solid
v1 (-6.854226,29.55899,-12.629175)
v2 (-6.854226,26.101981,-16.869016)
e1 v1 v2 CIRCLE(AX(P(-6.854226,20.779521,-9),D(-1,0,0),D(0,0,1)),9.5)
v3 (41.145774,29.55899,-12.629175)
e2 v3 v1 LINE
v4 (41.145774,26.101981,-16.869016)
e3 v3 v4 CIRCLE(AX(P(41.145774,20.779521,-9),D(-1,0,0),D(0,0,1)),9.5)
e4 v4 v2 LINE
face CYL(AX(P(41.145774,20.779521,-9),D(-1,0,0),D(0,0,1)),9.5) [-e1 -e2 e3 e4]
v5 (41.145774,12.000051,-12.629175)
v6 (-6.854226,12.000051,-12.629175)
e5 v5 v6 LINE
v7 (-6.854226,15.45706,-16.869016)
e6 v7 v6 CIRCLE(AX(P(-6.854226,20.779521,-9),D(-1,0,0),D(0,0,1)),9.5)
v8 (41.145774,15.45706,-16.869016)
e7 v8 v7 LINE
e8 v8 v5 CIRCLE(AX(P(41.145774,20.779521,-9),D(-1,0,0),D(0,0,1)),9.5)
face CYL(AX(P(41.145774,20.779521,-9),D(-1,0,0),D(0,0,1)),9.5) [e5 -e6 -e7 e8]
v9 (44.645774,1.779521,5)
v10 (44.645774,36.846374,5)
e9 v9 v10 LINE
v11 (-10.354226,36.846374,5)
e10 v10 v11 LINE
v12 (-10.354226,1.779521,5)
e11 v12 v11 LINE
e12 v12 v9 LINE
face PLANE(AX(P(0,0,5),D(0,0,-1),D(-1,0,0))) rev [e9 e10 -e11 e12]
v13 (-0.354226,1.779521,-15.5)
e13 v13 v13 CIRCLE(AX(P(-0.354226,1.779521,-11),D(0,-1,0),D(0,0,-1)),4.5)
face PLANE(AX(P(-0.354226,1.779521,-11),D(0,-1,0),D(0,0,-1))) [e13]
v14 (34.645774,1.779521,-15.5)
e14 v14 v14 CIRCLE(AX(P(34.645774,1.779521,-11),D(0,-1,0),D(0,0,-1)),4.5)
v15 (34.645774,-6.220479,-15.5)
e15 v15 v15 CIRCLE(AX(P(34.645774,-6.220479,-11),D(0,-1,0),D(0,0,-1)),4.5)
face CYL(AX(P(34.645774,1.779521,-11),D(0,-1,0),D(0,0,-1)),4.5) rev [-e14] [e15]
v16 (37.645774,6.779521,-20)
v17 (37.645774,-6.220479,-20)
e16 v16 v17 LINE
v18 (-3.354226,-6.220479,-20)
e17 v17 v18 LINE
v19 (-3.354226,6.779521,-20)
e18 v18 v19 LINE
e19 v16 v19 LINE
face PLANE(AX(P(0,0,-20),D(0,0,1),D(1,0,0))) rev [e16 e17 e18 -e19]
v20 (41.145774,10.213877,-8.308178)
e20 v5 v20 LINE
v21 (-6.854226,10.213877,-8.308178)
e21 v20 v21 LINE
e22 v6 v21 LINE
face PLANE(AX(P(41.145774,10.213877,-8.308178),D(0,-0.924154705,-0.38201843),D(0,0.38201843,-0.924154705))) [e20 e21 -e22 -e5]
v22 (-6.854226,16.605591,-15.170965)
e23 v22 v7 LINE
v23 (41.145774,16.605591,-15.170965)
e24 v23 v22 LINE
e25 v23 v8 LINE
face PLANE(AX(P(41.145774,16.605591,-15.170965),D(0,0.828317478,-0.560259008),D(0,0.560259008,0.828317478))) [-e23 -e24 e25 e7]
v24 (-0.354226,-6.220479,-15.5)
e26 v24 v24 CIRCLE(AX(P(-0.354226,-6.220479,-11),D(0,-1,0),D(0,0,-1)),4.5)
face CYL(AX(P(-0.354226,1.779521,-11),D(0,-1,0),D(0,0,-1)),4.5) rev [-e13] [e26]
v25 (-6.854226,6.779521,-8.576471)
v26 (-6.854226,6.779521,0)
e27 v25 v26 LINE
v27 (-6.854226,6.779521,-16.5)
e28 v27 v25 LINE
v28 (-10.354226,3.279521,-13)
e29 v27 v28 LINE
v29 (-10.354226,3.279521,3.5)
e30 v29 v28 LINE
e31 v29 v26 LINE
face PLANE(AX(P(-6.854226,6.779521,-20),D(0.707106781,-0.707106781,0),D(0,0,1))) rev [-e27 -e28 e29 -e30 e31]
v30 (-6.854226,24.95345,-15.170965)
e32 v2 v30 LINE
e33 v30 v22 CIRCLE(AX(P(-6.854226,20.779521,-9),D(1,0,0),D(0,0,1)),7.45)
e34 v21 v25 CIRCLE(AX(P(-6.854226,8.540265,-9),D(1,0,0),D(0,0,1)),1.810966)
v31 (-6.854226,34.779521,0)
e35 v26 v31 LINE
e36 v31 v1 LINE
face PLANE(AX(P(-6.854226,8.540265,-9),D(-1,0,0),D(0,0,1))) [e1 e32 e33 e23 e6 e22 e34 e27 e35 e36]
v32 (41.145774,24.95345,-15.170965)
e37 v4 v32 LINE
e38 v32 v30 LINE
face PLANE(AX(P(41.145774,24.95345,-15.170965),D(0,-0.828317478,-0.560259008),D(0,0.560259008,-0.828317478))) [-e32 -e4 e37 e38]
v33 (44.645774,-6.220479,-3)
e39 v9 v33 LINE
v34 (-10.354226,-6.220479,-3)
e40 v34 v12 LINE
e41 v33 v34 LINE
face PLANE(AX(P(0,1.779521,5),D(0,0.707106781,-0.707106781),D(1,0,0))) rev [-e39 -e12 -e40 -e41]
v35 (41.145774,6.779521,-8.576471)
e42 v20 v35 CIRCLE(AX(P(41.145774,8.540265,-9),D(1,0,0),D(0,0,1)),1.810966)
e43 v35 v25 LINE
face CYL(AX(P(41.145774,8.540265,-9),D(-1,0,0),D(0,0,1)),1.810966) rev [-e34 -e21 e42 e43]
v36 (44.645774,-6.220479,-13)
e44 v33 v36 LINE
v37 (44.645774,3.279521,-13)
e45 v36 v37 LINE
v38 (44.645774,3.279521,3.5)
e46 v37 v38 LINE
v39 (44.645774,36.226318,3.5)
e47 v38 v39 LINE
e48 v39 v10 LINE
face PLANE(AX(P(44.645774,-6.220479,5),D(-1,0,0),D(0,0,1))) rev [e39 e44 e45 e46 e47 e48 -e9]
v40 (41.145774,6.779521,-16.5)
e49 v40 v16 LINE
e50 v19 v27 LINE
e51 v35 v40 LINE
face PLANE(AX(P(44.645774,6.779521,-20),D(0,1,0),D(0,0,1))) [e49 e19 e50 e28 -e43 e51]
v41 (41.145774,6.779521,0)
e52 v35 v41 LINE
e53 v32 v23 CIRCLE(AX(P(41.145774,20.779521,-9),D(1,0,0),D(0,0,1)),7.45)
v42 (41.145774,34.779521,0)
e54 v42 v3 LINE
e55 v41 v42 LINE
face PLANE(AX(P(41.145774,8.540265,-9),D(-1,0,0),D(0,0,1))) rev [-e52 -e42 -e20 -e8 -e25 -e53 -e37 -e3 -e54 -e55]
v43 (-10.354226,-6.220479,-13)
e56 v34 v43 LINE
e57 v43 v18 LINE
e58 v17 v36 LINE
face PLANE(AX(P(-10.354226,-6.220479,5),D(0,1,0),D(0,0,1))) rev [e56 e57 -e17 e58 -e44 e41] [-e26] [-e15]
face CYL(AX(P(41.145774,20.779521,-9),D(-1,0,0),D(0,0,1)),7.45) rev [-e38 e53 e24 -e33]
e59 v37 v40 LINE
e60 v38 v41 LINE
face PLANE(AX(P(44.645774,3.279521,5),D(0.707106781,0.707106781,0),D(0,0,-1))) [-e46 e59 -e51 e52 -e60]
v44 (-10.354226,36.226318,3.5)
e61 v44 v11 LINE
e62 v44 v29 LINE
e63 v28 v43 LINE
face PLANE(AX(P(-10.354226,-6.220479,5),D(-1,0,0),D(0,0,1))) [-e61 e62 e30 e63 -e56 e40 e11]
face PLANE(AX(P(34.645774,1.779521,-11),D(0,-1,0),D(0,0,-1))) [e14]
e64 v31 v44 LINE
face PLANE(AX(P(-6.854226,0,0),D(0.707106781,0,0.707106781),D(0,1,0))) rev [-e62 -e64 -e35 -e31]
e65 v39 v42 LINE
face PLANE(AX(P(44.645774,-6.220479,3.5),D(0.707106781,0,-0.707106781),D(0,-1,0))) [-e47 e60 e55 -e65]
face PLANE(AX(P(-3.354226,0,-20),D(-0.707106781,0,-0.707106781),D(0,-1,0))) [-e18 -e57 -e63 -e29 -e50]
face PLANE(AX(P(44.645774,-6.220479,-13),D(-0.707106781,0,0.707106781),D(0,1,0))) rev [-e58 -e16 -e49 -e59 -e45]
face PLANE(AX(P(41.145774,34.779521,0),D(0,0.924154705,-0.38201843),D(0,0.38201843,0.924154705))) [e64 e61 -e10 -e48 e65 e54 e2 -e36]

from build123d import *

# Parameters (mm, degrees)
SKETCH1_W           = 55
SKETCH1_H           = 45
BOSS_EXTRUDE1_DEPTH = 5
SKETCH3_W           = 55
SKETCH3_H           = 13
BOSS_EXTRUDE5_DEPTH = 20
CHAMFER1_SIZE       = 8
SKETCH5_R           = 4.5
CUT_EXTRUDE2_DEPTH  = 8
BOSS_EXTRUDE7_DEPTH = 48
CUT_EXTRUDE3_DEPTH  = 71.205777697
CHAMFER2_SIZE       = 3.5
CHAMFER3_SIZE       = 3.5
CHAMFER4_SIZE       = 7


with BuildPart() as part:
    # Sketch1 → Boss-Extrude1 (new body)
    with BuildSketch(Plane.XY):
        with Locations((17.145774036, 16.279520652)):
            Rectangle(SKETCH1_W, SKETCH1_H)
    extrude(amount=BOSS_EXTRUDE1_DEPTH)

    # Sketch3 → Boss-Extrude5 (add)
    with BuildSketch(Plane(origin=(0, 0, 0), x_dir=(-1, 0, 0), z_dir=(0, 0, -1))):
        with Locations((-17.145774036, 0.279520652)):
            Rectangle(SKETCH3_W, SKETCH3_H)
    extrude(amount=BOSS_EXTRUDE5_DEPTH)

    # Chamfer1
    chamfer1_edges = [part.edges().sort_by_distance(p)[0] for p in [
        (17.145774036, -6.220479348, 5),
    ]]
    chamfer(chamfer1_edges, length=CHAMFER1_SIZE)

    # Sketch5 → Cut-Extrude2 (cut)
    with BuildSketch(Plane.XZ.offset(6.220479348)):
        with Locations(Location((-0.354225964, -11, 0), (0, 0, 270))):
            Circle(SKETCH5_R)
        with Locations(Location((34.645774036, -11, 0), (0, 0, 270))):
            Circle(SKETCH5_R)
    extrude(amount=-CUT_EXTRUDE2_DEPTH, mode=Mode.SUBTRACT)

    # Sketch7 → Boss-Extrude7 (add)
    with BuildSketch(Plane.ZY.offset(6.854225964)):
        with BuildLine():
            Line((-8.308177677, 10.21387745), (-12.629175087, 12.000050953))
            ThreePointArc((-12.629175087, 12.000050953), (-15.003318067, 13.416764905), (-16.86901604, 15.457060078))
            Line((-16.86901604, 15.457060078), (-15.17096521, 16.605591044))
            ThreePointArc((-15.17096521, 16.605591044), (-1.55, 20.779520652), (-15.17096521, 24.95345026))
            Line((-15.17096521, 24.95345026), (-16.86901604, 26.101981226))
            ThreePointArc((-16.86901604, 26.101981226), (-15.003318067, 28.142276398), (-12.629175087, 29.55899035))
            Line((-12.629175087, 29.55899035), (0, 34.779520652))
            Line((0, 34.779520652), (0, 6.779520652))
            Line((0, 6.779520652), (-8.576470695, 6.779520652))
            ThreePointArc((-8.576470695, 6.779520652), (-7.194534972, 8.39922137), (-8.308177677, 10.21387745))
        make_face()
    extrude(amount=-BOSS_EXTRUDE7_DEPTH)

    # Sketch8 → Cut-Extrude3 (cut, through all)
    with BuildSketch(Plane.ZY.offset(10.354225964)):
        Polygon((0, 34.779520652), (5, 36.846373896), (5, 38.779520652), (0, 38.779520652), align=None)
    extrude(amount=-CUT_EXTRUDE3_DEPTH, mode=Mode.SUBTRACT)

    # Chamfer2
    chamfer2_edges = [part.edges().sort_by_distance(p)[0] for p in [
        (-10.354225964, 6.779520652, -10),
        (-10.354225964, 20.779520652, 0),
    ]]
    chamfer(chamfer2_edges, length=CHAMFER2_SIZE - 0.0001)  # a hair under: the kernel refuses the full size

    # Chamfer3
    chamfer3_edges = [part.edges().sort_by_distance(p)[0] for p in [
        (44.645774036, 20.779520652, 0),
        (44.645774036, 6.779520652, -10),
    ]]
    chamfer(chamfer3_edges, length=CHAMFER3_SIZE - 0.0001)  # a hair under: the kernel refuses the full size

    # Chamfer4
    chamfer4_edges = [part.edges().sort_by_distance(p)[0] for p in [
        (44.645774036, -1.470429348, -20),
        (-10.354225964, -1.470429348, -20),
    ]]
    chamfer(chamfer4_edges, length=CHAMFER4_SIZE)


solid = part.part
